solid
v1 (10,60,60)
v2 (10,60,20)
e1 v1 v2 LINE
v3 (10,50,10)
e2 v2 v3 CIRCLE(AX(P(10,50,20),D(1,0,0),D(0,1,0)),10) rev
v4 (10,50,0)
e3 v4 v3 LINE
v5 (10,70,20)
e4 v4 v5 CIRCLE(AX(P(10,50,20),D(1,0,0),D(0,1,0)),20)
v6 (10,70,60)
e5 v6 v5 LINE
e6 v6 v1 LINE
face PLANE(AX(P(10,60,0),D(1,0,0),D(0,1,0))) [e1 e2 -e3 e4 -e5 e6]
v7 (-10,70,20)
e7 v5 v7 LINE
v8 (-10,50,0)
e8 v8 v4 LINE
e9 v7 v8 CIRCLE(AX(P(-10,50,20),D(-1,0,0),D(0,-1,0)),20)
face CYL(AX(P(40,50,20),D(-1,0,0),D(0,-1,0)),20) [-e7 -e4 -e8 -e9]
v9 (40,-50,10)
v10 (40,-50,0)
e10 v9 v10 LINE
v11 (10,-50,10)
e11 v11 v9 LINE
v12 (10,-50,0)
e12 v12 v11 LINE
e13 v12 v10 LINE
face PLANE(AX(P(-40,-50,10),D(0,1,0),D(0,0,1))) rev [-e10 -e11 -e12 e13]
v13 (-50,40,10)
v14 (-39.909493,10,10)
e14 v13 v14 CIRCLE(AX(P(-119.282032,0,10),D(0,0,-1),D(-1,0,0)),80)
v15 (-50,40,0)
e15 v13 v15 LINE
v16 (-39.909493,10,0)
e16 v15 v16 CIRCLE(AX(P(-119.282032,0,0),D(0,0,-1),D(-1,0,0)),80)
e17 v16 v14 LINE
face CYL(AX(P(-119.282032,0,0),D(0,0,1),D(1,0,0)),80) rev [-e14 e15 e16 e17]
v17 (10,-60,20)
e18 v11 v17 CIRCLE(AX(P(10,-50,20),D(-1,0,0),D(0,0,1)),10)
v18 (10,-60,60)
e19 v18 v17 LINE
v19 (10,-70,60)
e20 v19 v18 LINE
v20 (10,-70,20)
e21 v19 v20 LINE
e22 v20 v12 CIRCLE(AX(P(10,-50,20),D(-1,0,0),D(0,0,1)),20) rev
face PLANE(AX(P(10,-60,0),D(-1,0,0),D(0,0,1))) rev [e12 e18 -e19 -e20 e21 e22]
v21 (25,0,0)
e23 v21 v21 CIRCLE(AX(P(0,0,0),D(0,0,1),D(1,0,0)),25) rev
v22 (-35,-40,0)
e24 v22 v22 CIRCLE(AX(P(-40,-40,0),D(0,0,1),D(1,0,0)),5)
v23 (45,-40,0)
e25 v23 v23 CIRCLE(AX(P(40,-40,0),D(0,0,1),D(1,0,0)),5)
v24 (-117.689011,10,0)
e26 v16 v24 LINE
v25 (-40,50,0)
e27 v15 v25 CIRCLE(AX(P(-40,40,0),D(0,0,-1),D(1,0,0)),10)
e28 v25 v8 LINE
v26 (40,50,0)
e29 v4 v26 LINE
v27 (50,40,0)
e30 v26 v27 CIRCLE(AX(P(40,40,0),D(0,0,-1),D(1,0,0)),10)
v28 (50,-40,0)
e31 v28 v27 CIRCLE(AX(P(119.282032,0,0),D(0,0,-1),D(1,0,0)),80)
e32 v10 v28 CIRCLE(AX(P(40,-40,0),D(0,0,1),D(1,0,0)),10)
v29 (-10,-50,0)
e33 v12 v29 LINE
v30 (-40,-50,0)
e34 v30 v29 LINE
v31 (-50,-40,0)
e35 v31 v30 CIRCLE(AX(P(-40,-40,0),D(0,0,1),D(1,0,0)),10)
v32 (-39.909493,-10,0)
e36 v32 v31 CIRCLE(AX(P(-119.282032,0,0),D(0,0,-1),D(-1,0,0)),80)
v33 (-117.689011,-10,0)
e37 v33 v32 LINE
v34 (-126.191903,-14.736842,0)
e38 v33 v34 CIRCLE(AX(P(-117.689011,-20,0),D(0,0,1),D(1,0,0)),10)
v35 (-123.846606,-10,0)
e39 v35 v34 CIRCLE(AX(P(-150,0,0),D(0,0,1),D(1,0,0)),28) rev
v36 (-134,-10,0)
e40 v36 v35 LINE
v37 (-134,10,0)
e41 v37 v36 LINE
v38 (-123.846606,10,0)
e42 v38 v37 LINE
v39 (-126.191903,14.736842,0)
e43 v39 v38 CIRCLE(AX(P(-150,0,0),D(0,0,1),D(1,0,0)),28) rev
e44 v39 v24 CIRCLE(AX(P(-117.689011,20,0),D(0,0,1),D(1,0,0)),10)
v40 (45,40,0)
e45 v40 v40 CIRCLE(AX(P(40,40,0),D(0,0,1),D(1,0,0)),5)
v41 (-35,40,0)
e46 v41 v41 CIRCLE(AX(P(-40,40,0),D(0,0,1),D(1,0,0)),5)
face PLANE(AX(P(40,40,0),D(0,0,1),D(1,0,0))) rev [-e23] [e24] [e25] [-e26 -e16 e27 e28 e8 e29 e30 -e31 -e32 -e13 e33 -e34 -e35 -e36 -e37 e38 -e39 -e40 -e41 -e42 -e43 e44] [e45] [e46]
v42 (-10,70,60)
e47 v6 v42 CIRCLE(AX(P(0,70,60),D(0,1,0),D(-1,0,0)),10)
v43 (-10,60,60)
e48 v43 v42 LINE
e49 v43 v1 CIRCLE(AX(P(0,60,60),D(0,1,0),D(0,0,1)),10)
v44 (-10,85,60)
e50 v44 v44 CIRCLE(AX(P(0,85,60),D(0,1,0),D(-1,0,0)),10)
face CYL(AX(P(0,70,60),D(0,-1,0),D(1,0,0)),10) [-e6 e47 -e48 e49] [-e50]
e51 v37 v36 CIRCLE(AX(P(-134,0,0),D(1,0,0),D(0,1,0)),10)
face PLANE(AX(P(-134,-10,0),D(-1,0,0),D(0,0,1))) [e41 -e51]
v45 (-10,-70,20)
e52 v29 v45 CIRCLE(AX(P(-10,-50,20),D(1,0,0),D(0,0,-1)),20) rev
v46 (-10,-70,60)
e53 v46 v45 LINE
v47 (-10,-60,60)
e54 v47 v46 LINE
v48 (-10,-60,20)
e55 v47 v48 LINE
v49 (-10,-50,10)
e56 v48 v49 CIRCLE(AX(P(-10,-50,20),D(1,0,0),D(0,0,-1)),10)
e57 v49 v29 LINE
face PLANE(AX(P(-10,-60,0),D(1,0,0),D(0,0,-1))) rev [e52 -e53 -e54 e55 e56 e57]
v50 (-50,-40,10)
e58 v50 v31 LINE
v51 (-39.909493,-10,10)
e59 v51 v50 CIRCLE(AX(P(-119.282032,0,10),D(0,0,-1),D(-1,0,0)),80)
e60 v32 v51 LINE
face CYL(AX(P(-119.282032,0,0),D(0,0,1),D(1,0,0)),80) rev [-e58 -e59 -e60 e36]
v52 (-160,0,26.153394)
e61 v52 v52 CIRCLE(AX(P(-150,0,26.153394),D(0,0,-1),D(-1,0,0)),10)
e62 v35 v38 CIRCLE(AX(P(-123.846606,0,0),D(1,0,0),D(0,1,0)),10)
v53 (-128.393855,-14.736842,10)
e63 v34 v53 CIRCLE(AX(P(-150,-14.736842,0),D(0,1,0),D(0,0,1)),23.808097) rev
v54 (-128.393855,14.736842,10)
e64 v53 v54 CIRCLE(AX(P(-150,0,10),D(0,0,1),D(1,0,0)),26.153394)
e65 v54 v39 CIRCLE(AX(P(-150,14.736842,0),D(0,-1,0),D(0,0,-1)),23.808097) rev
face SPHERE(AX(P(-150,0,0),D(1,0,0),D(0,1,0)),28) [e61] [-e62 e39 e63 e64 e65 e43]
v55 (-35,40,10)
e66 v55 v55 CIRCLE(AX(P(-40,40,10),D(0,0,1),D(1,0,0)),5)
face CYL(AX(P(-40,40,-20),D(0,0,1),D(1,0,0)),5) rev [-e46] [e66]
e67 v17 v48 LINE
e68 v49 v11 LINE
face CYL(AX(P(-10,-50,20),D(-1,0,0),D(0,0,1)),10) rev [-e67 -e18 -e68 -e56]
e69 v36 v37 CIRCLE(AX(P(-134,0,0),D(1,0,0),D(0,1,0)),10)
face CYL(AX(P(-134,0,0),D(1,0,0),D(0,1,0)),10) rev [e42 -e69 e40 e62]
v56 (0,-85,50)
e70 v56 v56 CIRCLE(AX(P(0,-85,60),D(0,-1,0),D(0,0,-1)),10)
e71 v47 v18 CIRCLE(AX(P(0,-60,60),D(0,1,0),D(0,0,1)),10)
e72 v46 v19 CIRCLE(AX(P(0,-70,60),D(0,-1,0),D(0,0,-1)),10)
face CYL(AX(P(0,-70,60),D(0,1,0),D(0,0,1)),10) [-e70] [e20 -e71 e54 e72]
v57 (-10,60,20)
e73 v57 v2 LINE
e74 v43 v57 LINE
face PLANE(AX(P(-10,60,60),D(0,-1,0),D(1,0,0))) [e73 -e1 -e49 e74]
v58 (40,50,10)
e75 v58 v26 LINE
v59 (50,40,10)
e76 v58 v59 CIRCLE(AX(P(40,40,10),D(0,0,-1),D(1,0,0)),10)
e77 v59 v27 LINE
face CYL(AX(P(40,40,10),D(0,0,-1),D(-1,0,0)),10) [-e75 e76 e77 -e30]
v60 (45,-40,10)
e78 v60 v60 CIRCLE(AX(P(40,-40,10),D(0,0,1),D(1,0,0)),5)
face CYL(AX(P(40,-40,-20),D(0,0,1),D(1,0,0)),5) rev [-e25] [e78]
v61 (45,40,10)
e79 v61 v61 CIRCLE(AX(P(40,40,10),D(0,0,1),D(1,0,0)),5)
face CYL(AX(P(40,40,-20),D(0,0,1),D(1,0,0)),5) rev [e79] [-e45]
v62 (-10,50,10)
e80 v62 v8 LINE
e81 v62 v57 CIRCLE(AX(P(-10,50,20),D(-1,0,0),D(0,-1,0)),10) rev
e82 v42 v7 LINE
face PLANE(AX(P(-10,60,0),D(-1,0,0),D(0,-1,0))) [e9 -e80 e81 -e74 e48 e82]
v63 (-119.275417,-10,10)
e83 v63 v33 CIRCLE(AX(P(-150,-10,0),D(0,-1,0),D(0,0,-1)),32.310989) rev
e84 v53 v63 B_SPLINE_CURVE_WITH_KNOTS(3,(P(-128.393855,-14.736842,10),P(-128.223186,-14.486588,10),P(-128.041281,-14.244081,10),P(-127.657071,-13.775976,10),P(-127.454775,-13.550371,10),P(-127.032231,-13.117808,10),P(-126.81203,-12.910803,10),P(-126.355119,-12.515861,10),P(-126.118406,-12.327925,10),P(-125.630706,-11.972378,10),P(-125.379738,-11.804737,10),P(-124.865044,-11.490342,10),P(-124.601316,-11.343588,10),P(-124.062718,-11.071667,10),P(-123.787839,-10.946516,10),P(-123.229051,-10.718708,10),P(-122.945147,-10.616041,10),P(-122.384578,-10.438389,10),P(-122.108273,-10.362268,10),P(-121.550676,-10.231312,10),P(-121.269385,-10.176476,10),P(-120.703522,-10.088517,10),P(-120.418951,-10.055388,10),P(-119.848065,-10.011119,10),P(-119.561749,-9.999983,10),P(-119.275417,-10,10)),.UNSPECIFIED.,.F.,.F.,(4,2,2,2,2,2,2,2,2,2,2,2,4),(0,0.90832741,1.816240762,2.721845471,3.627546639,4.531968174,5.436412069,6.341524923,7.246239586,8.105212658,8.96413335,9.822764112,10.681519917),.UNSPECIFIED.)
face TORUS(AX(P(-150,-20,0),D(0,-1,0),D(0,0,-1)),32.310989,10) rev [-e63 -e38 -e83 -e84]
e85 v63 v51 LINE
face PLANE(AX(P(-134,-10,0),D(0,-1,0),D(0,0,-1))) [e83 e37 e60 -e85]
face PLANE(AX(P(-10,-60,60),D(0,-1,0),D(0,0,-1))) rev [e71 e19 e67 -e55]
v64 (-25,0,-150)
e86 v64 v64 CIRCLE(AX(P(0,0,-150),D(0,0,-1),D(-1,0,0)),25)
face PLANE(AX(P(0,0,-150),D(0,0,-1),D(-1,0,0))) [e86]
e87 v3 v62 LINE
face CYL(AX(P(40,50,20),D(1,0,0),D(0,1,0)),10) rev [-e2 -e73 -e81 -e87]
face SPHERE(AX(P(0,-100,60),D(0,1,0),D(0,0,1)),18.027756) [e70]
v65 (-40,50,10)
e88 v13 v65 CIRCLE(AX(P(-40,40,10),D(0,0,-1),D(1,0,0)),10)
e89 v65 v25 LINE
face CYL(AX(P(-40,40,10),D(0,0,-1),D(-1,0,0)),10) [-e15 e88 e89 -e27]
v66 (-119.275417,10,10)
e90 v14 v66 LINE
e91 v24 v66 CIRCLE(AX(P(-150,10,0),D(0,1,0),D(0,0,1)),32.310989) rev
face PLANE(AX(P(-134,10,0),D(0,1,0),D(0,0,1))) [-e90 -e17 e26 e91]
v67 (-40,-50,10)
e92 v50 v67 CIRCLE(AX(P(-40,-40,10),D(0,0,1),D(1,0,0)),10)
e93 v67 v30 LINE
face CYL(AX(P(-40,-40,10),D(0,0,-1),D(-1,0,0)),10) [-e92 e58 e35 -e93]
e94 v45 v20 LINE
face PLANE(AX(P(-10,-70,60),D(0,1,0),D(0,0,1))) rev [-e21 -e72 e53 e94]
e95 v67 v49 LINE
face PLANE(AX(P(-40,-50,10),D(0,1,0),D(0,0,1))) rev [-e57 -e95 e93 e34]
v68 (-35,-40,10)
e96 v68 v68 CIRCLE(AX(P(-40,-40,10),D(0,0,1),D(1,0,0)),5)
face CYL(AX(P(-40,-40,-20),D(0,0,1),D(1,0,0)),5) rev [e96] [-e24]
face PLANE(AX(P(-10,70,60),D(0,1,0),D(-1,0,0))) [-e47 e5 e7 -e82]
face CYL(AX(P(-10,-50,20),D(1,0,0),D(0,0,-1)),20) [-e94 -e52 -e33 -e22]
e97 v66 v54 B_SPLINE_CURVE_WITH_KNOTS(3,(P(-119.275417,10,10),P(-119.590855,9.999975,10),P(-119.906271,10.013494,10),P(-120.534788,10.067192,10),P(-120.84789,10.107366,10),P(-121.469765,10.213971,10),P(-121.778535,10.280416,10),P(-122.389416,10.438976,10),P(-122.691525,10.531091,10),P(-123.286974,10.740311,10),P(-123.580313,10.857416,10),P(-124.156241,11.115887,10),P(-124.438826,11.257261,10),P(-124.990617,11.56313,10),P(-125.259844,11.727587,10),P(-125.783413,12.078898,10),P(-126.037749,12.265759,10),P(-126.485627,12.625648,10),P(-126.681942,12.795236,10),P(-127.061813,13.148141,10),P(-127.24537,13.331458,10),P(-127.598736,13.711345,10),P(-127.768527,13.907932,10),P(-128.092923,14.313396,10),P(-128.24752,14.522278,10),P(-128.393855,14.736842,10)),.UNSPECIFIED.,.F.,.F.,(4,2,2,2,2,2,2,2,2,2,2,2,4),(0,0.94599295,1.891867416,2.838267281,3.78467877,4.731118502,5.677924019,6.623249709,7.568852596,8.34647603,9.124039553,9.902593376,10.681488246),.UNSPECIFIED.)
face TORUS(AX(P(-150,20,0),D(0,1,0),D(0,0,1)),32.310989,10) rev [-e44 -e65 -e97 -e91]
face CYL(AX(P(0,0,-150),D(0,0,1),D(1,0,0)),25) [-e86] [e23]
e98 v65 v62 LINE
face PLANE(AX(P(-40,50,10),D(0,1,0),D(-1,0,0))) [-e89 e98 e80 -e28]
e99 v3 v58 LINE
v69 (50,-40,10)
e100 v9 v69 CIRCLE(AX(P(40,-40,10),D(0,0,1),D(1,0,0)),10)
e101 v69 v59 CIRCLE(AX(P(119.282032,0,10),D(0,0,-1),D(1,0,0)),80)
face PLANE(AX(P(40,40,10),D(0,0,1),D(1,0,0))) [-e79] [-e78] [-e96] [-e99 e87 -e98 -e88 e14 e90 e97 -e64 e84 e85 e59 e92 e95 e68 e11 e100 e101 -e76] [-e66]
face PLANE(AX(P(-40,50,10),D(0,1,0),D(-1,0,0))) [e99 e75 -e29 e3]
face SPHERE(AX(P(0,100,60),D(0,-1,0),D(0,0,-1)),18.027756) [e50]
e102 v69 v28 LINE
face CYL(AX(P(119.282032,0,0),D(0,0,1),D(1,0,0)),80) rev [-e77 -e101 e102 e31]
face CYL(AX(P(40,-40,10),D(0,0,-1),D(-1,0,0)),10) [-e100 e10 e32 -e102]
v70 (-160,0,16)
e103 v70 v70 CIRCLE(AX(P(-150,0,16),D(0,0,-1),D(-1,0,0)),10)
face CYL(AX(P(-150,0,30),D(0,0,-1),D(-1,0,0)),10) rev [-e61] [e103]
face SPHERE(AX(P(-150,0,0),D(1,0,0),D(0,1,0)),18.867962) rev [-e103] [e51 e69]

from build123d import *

# Parameters (mm, degrees)
BOSS_EXTRUDE1_DEPTH  = 10
CUT_EXTRUDE1_DEPTH   = 10
SKETCH6_W            = 20
SKETCH6_H            = 10
BOSS_EXTRUDE5_DEPTH  = 10
SKETCH7_W            = 20
SKETCH7_H            = 10
BOSS_EXTRUDE6_DEPTH  = 60
FILLET7_R            = 20
FILLET8_R            = 10
BOSS_EXTRUDE7_DEPTH  = 10
CUT_EXTRUDE7_DEPTH   = 18
FILLET7_OF_MIRROR2_R = 20
FILLET8_OF_MIRROR2_R = 10
SKETCH19_R           = 5
CUT_EXTRUDE9_DEPTH   = 30
SKETCH29_R           = 10
BOSS_EXTRUDE16_DEPTH = 15
SKETCH31_R           = 10
BOSS_EXTRUDE17_DEPTH = 15
BOSS_EXTRUDE21_DEPTH = 10
FILLET9_R            = 10
FILLET10_R           = 10
SKETCH35_R           = 10
CUT_EXTRUDE11_DEPTH  = 30
SKETCH16_R           = 25
BOSS_EXTRUDE22_DEPTH = 150


with BuildPart() as part:
    # Sketch2 → Boss-Extrude1 (new body)
    with BuildSketch(Plane.XY):
        with BuildLine():
            Line((-40, 50), (40, 50))
            ThreePointArc((40, 50), (47.071067812, 47.071067812), (50, 40))
            Line((50, 40), (50, -40))
            ThreePointArc((50, -40), (47.071067812, -47.071067812), (40, -50))
            Line((40, -50), (-40, -50))
            ThreePointArc((-40, -50), (-47.071067812, -47.071067812), (-50, -40))
            Line((-50, -40), (-50, 40))
            ThreePointArc((-50, 40), (-47.071067812, 47.071067812), (-40, 50))
        make_face()
    boss_extrude1 = extrude(amount=BOSS_EXTRUDE1_DEPTH)

    # Sketch3 → Cut-Extrude1 (cut)
    with BuildSketch(Plane.XY.offset(10)):
        with BuildLine():
            Line((-50, 40), (-50, -40))
            ThreePointArc((-50, -40), (-39.282032303, 0), (-50, 40))
        make_face()
        with BuildLine():
            Line((50, 40), (50, -40))
            ThreePointArc((50, -40), (39.282032303, 0), (50, 40))
        make_face()
    cut_extrude1 = extrude(amount=-CUT_EXTRUDE1_DEPTH, mode=Mode.SUBTRACT)

    # Sketch6 → Boss-Extrude5 (add)
    with BuildSketch(Plane.XZ.offset(50)):
        with Locations((0, 5)):
            Rectangle(SKETCH6_W, SKETCH6_H)
    boss_extrude5 = extrude(amount=BOSS_EXTRUDE5_DEPTH)

    # Sketch7 → Boss-Extrude6 (add)
    with BuildSketch(Plane.XY):
        with Locations((0, -65)):
            Rectangle(SKETCH7_W, SKETCH7_H)
    boss_extrude6 = extrude(amount=BOSS_EXTRUDE6_DEPTH)

    # Fillet7
    fillet7_edges = [part.edges().sort_by_distance(p)[0] for p in [
        (0, -70, 0),
    ]]
    fillet(fillet7_edges, radius=FILLET7_R)

    # Fillet8
    fillet8_edges = [part.edges().sort_by_distance(p)[0] for p in [
        (0, -60, 10),
    ]]
    fillet(fillet8_edges, radius=FILLET8_R)

    # Sketch8 → Boss-Extrude7 (add)
    with BuildSketch(Plane(origin=(0, -60, 0), x_dir=(1, 0, 0), z_dir=(0, 1, 0))):
        with BuildLine():
            Line((10, -60), (-10, -60))
            ThreePointArc((-10, -60), (0, -70), (10, -60))
        make_face()
    boss_extrude7 = extrude(amount=-BOSS_EXTRUDE7_DEPTH)

    # Sketch14 → Cut-Extrude7 (cut)
    with BuildSketch(Plane.XY.offset(10)):
        with BuildLine():
            Line((-39.282032303, 0), (39.282032303, 0))
            add(Edge.make_bspline(
                [(50, 40), (39.359472874, 21.350658255), (39.282032303, 0)],
                knots=[0, 0, 0, 1, 1, 1], degree=2))
            add(Edge.make_bspline(
                [(40, 50), (49.142135624, 49.142135624), (50, 40)],
                knots=[0, 0, 0, 1, 1, 1], degree=2))
            Line((40, 50), (-40, 50))
            add(Edge.make_bspline(
                [(-50, 40), (-49.142135624, 49.142135624), (-40, 50)],
                knots=[0, 0, 0, 1, 1, 1], degree=2))
            add(Edge.make_bspline(
                [(-39.282032303, 0), (-39.359472874, 21.350658255), (-50, 40)],
                knots=[0, 0, 0, 1, 1, 1], degree=2))
        make_face()
    extrude(amount=-CUT_EXTRUDE7_DEPTH, mode=Mode.SUBTRACT)


with BuildPart() as cut_extrude7_kept_piece:
    # of the separate pieces the step leaves, the one the design keeps (cut_extrude7_pieces_kept)
    add(part.part.solids().sort_by_distance((-10, -60, 20))[0])

    # Mirror2: Boss-Extrude1, Cut-Extrude1, Boss-Extrude5, Boss-Extrude6, Boss-Extrude7 across plane
    add(boss_extrude1.mirror(Plane(origin=(-39.282032303, 0, -8), x_dir=(0, 0, 1), z_dir=(0, -1, 0))))
    add(cut_extrude1.mirror(Plane(origin=(-39.282032303, 0, -8), x_dir=(0, 0, 1), z_dir=(0, -1, 0))), mode=Mode.SUBTRACT)
    add(boss_extrude5.mirror(Plane(origin=(-39.282032303, 0, -8), x_dir=(0, 0, 1), z_dir=(0, -1, 0))))
    add(boss_extrude6.mirror(Plane(origin=(-39.282032303, 0, -8), x_dir=(0, 0, 1), z_dir=(0, -1, 0))))
    add(boss_extrude7.mirror(Plane(origin=(-39.282032303, 0, -8), x_dir=(0, 0, 1), z_dir=(0, -1, 0))))

    # Fillet7 of Mirror2
    fillet7_of_mirror2_edges = [cut_extrude7_kept_piece.edges().sort_by_distance(p)[0] for p in [
        (0, 70, 0),
    ]]
    fillet(fillet7_of_mirror2_edges, radius=FILLET7_OF_MIRROR2_R)

    # Fillet8 of Mirror2
    fillet8_of_mirror2_edges = [cut_extrude7_kept_piece.edges().sort_by_distance(p)[0] for p in [
        (0, 60, 10),
    ]]
    fillet(fillet8_of_mirror2_edges, radius=FILLET8_OF_MIRROR2_R)

    # Sketch19 → Cut-Extrude9 (cut)
    with BuildSketch(Plane.XY.offset(10)):
        with Locations((-40, 40)):
            Circle(SKETCH19_R)
        with Locations((40, 40)):
            Circle(SKETCH19_R)
        with Locations((-40, -40)):
            Circle(SKETCH19_R)
        with Locations((40, -40)):
            Circle(SKETCH19_R)
    extrude(amount=-CUT_EXTRUDE9_DEPTH, mode=Mode.SUBTRACT)

    # Sketch29 → Boss-Extrude16 (add)
    with BuildSketch(Plane(origin=(0, 70, 0), x_dir=(1, 0, 0), z_dir=(0, 1, 0))):
        with Locations(Location((0, -60, 0), (0, 0, 180))):
            Circle(SKETCH29_R)
    extrude(amount=BOSS_EXTRUDE16_DEPTH)

    # Sketch30 → Revolve2 (revolve)
    with BuildSketch(Plane(origin=(0, 0, 0), x_dir=(0, 0, -1), z_dir=(1, 0, 0))):
        with BuildLine():
            Line((-60, 118.027756377), (-60, 85))
            Line((-60, 85), (-50, 85))
            ThreePointArc((-50, 85), (-42.745778116, 105.224158035), (-60, 118.027756377))
        make_face()
    revolve(axis=Axis((0, 85, 60), (0, 1, 0)))

    # Sketch31 → Boss-Extrude17 (add)
    with BuildSketch(Plane.XZ.offset(70)):
        with Locations(Location((0, 60, 0), (0, 0, 180))):
            Circle(SKETCH31_R)
    extrude(amount=BOSS_EXTRUDE17_DEPTH)

    # Sketch32 → Revolve3 (revolve)
    with BuildSketch(Plane(origin=(0, 0, 0), x_dir=(0, 0, -1), z_dir=(1, 0, 0))):
        with BuildLine():
            Line((-60, -118.027756377), (-60, -85))
            Line((-60, -85), (-70, -85))
            ThreePointArc((-70, -85), (-77.254221884, -105.224158035), (-60, -118.027756377))
        make_face()
    revolve(axis=Axis((0, -85, 60), (0, -1, 0)))

    # Sketch33 → Boss-Extrude21 (add)
    with BuildSketch(Plane.XY.offset(10)):
        with BuildLine():
            Line((-134, 10), (-39.909492971, 10))
            ThreePointArc((-39.909492971, 10), (-39.282032303, 0), (-39.909492971, -10))
            Line((-39.909492971, -10), (-134, -10))
            Line((-134, -10), (-134, 10))
        make_face()
    extrude(amount=-BOSS_EXTRUDE21_DEPTH)

    # Sketch34 → Revolve5 (revolve)
    with BuildSketch(Plane.XY):
        with BuildLine():
            Line((-178, 0), (-168.867962264, 0))
            ThreePointArc((-168.867962264, 0), (-155.201567253, 18.136805069), (-134, 10))
            Line((-134, 10), (-123.846606339, 10))
            ThreePointArc((-123.846606339, 10), (-155.08453427, 27.534478591), (-178, 0))
        make_face()
    revolve(axis=Axis((-134, 0, 0), (-1, 0, 0)))

    # Fillet9
    # the kernel refuses this fillet: 10 mm, written as the material it adds along each edge
    with BuildSketch(Plane(origin=(-150, 10, 0), x_dir=(1, 0, 0), z_dir=(0, 0, -1))) as fillet9_piece_1_section:
        with BuildLine():
            CenterArc((32.310988843, -10), FILLET9_R, 90, 58.243136141)
            ThreePointArc((23.808097042, -4.736842105), (25.09276901, -2.423886002), (26.153393661, 0))
            Line((26.153393661, 0), (32.310988843, 0))
        make_face()
    fillet9_piece_1 = revolve(axis=Axis((-150, 10, 0), (0, -1, 0)), revolution_arc=56.205276657, mode=Mode.PRIVATE)
    fillet9_piece_1 = split(fillet9_piece_1, bisect_by=Plane(origin=(-123.595029593, 11.027181376, 10), z_dir=(0, 0, -1)), keep=Keep.TOP, mode=Mode.PRIVATE)
    add(fillet9_piece_1)

    # Fillet10
    # the kernel refuses this fillet: 10 mm, written as the material it adds along each edge
    with BuildSketch(Plane(origin=(-150, -10, 0), x_dir=(0.5562190835944724, 0, 0.8310356978164808), z_dir=(-0.8310356978164808, 0, 0.5562190835944724))) as fillet10_piece_1_section:
        with BuildLine():
            CenterArc((32.310988843, -10), FILLET10_R, 90, 58.243136141)
            ThreePointArc((23.808097042, -4.736842105), (25.09276901, -2.423886002), (26.153393661, 0))
            Line((26.153393661, 0), (32.310988843, 0))
        make_face()
    fillet10_piece_1 = revolve(axis=Axis((-150, -10, 0), (0, 1, 0)), revolution_arc=56.205276657, mode=Mode.PRIVATE)
    fillet10_piece_1 = split(fillet10_piece_1, bisect_by=Plane(origin=(-123.595029593, -11.027181376, 10), z_dir=(0, 0, -1)), keep=Keep.TOP, mode=Mode.PRIVATE)
    add(fillet10_piece_1)

    # Sketch35 → Cut-Extrude11 (cut)
    with BuildSketch(Plane.XY):
        with Locations(Location((-150, 0, 0), (0, 0, 180))):
            Circle(SKETCH35_R)
    extrude(amount=CUT_EXTRUDE11_DEPTH, mode=Mode.SUBTRACT)

    # Sketch16 → Boss-Extrude22 (add)
    with BuildSketch(Plane(origin=(0, 0, 0), x_dir=(-1, 0, 0), z_dir=(0, 0, -1))):
        with Locations(Location((0, 0, 0), (0, 0, 180))):
            Circle(SKETCH16_R)
    extrude(amount=BOSS_EXTRUDE22_DEPTH)


solid = cut_extrude7_kept_piece.part
